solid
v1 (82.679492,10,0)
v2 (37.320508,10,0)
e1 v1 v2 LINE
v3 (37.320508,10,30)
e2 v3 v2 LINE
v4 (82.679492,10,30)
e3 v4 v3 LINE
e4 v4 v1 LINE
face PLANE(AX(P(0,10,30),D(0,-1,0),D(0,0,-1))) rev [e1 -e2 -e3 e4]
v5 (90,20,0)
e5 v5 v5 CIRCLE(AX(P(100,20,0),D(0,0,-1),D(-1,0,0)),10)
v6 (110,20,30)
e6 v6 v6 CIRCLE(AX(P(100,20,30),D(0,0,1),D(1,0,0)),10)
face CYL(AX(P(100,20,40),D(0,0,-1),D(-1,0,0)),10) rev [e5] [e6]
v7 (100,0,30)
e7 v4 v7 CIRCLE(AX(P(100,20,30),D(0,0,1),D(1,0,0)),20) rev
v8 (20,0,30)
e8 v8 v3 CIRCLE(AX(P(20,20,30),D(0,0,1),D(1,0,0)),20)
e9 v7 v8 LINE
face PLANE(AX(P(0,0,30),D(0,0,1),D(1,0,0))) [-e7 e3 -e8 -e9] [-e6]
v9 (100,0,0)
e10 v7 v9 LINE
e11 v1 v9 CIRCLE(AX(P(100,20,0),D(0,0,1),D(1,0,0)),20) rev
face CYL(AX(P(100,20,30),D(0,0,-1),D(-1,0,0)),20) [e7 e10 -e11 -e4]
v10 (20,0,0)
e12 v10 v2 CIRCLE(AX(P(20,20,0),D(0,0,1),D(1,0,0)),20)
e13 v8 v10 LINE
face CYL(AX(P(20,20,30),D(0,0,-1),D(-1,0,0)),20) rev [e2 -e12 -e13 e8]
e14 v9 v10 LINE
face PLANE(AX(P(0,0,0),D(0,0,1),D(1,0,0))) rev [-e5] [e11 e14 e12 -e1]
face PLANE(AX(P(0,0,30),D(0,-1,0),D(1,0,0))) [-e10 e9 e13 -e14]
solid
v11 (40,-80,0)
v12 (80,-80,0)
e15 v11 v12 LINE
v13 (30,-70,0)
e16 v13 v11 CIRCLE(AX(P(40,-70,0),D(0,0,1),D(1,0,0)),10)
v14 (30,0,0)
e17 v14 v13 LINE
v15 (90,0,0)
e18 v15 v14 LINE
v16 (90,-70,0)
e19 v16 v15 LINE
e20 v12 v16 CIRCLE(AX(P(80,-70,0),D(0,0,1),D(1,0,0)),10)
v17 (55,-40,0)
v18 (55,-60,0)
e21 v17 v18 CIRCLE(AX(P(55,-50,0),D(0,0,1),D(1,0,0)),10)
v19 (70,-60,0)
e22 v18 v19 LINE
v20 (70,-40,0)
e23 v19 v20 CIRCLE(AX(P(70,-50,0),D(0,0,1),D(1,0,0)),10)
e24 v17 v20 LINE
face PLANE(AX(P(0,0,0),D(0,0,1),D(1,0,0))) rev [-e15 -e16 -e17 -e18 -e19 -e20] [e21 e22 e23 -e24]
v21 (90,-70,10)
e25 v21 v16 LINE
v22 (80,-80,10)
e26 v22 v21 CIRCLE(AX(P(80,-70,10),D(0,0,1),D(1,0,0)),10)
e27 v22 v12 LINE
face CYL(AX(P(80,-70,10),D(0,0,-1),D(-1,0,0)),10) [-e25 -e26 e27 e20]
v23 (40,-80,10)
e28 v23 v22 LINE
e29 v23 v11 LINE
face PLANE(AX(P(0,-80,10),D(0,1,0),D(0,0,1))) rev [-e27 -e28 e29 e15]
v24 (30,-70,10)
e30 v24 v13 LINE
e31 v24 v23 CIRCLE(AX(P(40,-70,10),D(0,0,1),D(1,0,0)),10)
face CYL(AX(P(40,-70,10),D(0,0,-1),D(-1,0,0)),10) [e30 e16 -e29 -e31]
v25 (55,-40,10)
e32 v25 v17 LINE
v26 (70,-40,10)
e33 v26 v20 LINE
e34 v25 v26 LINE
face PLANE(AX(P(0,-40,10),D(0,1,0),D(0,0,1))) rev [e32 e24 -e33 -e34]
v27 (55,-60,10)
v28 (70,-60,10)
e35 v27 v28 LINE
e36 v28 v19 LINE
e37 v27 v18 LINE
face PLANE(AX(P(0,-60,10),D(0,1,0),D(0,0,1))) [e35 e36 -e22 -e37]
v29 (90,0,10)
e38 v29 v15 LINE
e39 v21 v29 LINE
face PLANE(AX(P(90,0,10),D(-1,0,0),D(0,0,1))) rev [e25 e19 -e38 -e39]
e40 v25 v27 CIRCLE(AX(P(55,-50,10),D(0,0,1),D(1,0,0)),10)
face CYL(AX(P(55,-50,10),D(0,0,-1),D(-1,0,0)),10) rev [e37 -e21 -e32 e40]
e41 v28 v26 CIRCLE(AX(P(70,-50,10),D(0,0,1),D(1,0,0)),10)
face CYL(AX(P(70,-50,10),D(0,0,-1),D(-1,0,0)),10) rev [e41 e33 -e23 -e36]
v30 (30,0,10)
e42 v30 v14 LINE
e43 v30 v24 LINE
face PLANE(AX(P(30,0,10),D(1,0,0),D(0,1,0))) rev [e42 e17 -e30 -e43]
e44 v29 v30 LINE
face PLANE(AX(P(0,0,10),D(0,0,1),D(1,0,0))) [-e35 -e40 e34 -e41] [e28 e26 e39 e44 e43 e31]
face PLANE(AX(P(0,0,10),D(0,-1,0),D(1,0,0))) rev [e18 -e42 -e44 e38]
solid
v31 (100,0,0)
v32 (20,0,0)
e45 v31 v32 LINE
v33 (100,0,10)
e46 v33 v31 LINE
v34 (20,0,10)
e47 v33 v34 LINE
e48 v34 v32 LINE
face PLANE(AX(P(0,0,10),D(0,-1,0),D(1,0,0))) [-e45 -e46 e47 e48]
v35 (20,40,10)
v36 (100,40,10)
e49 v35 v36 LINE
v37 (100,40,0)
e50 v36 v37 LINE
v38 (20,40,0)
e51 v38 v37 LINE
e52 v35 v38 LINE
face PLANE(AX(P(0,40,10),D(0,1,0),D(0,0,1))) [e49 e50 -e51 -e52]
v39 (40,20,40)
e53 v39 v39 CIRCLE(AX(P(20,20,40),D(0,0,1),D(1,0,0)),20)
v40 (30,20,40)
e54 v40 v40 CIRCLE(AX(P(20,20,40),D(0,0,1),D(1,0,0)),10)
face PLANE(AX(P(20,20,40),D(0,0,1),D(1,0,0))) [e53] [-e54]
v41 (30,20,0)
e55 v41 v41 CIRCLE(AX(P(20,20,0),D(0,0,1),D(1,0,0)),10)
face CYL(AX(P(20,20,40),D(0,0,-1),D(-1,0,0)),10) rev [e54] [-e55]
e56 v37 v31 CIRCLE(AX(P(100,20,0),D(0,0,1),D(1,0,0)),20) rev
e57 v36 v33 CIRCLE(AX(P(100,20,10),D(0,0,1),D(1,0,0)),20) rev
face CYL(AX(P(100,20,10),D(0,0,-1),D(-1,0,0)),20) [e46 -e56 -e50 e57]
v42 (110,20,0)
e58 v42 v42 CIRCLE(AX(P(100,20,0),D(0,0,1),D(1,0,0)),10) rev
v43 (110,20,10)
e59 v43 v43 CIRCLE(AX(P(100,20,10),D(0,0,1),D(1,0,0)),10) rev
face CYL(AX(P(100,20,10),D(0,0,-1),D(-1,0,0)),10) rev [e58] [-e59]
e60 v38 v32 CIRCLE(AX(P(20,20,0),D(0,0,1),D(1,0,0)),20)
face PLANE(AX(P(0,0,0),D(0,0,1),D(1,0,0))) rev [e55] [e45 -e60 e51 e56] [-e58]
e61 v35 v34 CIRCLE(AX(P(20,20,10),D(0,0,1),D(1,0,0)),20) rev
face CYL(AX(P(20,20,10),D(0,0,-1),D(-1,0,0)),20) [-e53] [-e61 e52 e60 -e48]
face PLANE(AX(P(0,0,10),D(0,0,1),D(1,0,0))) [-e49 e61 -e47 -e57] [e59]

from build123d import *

# Parameters (mm, degrees)
SKETCH1_R           = 10
BOSS_EXTRUDE1_DEPTH = 10
SKETCH1_4_R         = 20
BOSS_EXTRUDE2_DEPTH = 40
SKETCH1_5_R         = 10
CUT_EXTRUDE1_DEPTH  = 133.664991614
BOSS_EXTRUDE3_DEPTH = 30
SKETCH1_11_R        = 10
CUT_EXTRUDE2_DEPTH  = 133.664991614
BOSS_EXTRUDE4_DEPTH = 10


with BuildPart() as part:
    # Sketch1 → Boss-Extrude1 (new body)
    with BuildSketch(Plane.XY):
        with BuildLine():
            Line((100, 40), (20, 40))
            ThreePointArc((20, 40), (0, 20), (20, 0))
            Line((20, 0), (100, 0))
            ThreePointArc((100, 0), (120, 20), (100, 40))
        make_face()
        with Locations((100, 20)):
            Circle(SKETCH1_R, mode=Mode.SUBTRACT)
        with Locations((20, 20)):
            Circle(SKETCH1_R, mode=Mode.SUBTRACT)
    extrude(amount=BOSS_EXTRUDE1_DEPTH)

    # Sketch1<4> → Boss-Extrude2 (add)
    with BuildSketch(Plane.XY):
        with Locations((20, 20)):
            Circle(SKETCH1_4_R)
    extrude(amount=BOSS_EXTRUDE2_DEPTH)

    # Sketch1<5> → Cut-Extrude1 (cut, through all)
    with BuildSketch(Plane.XY):
        with Locations((20, 20)):
            Circle(SKETCH1_5_R)
    extrude(amount=CUT_EXTRUDE1_DEPTH, mode=Mode.SUBTRACT)


with BuildPart() as body_2:
    # Sketch1<10> → Boss-Extrude3 (new body)
    with BuildSketch(Plane.XY):
        with BuildLine():
            ThreePointArc((100, 0), (110, 37.320508076), (82.679491924, 10))
            Line((82.679491924, 10), (37.320508076, 10))
            ThreePointArc((37.320508076, 10), (30, 2.679491924), (20, 0))
            Line((20, 0), (100, 0))
        make_face()
    extrude(amount=BOSS_EXTRUDE3_DEPTH)

    # Sketch1<11> → Cut-Extrude2 (cut, through all)
    with BuildSketch(Plane.XY):
        with Locations((100, 20)):
            Circle(SKETCH1_11_R)
    extrude(amount=CUT_EXTRUDE2_DEPTH, mode=Mode.SUBTRACT)


with BuildPart() as body_3:
    # Sketch1<13> → Boss-Extrude4 (new body)
    with BuildSketch(Plane.XY):
        with BuildLine():
            Line((90, 0), (30, 0))
            Line((30, 0), (30, -70))
            ThreePointArc((30, -70), (32.928932188, -77.071067812), (40, -80))
            Line((40, -80), (80, -80))
            ThreePointArc((80, -80), (87.071067812, -77.071067812), (90, -70))
            Line((90, -70), (90, 0))
        make_face()
        with BuildLine():
            ThreePointArc((55, -60), (45, -50), (55, -40))
            Line((55, -40), (70, -40))
            ThreePointArc((70, -40), (80, -50), (70, -60))
            Line((70, -60), (55, -60))
        make_face(mode=Mode.SUBTRACT)
    extrude(amount=BOSS_EXTRUDE4_DEPTH)


solid = Compound([part.part, body_2.part, body_3.part])
